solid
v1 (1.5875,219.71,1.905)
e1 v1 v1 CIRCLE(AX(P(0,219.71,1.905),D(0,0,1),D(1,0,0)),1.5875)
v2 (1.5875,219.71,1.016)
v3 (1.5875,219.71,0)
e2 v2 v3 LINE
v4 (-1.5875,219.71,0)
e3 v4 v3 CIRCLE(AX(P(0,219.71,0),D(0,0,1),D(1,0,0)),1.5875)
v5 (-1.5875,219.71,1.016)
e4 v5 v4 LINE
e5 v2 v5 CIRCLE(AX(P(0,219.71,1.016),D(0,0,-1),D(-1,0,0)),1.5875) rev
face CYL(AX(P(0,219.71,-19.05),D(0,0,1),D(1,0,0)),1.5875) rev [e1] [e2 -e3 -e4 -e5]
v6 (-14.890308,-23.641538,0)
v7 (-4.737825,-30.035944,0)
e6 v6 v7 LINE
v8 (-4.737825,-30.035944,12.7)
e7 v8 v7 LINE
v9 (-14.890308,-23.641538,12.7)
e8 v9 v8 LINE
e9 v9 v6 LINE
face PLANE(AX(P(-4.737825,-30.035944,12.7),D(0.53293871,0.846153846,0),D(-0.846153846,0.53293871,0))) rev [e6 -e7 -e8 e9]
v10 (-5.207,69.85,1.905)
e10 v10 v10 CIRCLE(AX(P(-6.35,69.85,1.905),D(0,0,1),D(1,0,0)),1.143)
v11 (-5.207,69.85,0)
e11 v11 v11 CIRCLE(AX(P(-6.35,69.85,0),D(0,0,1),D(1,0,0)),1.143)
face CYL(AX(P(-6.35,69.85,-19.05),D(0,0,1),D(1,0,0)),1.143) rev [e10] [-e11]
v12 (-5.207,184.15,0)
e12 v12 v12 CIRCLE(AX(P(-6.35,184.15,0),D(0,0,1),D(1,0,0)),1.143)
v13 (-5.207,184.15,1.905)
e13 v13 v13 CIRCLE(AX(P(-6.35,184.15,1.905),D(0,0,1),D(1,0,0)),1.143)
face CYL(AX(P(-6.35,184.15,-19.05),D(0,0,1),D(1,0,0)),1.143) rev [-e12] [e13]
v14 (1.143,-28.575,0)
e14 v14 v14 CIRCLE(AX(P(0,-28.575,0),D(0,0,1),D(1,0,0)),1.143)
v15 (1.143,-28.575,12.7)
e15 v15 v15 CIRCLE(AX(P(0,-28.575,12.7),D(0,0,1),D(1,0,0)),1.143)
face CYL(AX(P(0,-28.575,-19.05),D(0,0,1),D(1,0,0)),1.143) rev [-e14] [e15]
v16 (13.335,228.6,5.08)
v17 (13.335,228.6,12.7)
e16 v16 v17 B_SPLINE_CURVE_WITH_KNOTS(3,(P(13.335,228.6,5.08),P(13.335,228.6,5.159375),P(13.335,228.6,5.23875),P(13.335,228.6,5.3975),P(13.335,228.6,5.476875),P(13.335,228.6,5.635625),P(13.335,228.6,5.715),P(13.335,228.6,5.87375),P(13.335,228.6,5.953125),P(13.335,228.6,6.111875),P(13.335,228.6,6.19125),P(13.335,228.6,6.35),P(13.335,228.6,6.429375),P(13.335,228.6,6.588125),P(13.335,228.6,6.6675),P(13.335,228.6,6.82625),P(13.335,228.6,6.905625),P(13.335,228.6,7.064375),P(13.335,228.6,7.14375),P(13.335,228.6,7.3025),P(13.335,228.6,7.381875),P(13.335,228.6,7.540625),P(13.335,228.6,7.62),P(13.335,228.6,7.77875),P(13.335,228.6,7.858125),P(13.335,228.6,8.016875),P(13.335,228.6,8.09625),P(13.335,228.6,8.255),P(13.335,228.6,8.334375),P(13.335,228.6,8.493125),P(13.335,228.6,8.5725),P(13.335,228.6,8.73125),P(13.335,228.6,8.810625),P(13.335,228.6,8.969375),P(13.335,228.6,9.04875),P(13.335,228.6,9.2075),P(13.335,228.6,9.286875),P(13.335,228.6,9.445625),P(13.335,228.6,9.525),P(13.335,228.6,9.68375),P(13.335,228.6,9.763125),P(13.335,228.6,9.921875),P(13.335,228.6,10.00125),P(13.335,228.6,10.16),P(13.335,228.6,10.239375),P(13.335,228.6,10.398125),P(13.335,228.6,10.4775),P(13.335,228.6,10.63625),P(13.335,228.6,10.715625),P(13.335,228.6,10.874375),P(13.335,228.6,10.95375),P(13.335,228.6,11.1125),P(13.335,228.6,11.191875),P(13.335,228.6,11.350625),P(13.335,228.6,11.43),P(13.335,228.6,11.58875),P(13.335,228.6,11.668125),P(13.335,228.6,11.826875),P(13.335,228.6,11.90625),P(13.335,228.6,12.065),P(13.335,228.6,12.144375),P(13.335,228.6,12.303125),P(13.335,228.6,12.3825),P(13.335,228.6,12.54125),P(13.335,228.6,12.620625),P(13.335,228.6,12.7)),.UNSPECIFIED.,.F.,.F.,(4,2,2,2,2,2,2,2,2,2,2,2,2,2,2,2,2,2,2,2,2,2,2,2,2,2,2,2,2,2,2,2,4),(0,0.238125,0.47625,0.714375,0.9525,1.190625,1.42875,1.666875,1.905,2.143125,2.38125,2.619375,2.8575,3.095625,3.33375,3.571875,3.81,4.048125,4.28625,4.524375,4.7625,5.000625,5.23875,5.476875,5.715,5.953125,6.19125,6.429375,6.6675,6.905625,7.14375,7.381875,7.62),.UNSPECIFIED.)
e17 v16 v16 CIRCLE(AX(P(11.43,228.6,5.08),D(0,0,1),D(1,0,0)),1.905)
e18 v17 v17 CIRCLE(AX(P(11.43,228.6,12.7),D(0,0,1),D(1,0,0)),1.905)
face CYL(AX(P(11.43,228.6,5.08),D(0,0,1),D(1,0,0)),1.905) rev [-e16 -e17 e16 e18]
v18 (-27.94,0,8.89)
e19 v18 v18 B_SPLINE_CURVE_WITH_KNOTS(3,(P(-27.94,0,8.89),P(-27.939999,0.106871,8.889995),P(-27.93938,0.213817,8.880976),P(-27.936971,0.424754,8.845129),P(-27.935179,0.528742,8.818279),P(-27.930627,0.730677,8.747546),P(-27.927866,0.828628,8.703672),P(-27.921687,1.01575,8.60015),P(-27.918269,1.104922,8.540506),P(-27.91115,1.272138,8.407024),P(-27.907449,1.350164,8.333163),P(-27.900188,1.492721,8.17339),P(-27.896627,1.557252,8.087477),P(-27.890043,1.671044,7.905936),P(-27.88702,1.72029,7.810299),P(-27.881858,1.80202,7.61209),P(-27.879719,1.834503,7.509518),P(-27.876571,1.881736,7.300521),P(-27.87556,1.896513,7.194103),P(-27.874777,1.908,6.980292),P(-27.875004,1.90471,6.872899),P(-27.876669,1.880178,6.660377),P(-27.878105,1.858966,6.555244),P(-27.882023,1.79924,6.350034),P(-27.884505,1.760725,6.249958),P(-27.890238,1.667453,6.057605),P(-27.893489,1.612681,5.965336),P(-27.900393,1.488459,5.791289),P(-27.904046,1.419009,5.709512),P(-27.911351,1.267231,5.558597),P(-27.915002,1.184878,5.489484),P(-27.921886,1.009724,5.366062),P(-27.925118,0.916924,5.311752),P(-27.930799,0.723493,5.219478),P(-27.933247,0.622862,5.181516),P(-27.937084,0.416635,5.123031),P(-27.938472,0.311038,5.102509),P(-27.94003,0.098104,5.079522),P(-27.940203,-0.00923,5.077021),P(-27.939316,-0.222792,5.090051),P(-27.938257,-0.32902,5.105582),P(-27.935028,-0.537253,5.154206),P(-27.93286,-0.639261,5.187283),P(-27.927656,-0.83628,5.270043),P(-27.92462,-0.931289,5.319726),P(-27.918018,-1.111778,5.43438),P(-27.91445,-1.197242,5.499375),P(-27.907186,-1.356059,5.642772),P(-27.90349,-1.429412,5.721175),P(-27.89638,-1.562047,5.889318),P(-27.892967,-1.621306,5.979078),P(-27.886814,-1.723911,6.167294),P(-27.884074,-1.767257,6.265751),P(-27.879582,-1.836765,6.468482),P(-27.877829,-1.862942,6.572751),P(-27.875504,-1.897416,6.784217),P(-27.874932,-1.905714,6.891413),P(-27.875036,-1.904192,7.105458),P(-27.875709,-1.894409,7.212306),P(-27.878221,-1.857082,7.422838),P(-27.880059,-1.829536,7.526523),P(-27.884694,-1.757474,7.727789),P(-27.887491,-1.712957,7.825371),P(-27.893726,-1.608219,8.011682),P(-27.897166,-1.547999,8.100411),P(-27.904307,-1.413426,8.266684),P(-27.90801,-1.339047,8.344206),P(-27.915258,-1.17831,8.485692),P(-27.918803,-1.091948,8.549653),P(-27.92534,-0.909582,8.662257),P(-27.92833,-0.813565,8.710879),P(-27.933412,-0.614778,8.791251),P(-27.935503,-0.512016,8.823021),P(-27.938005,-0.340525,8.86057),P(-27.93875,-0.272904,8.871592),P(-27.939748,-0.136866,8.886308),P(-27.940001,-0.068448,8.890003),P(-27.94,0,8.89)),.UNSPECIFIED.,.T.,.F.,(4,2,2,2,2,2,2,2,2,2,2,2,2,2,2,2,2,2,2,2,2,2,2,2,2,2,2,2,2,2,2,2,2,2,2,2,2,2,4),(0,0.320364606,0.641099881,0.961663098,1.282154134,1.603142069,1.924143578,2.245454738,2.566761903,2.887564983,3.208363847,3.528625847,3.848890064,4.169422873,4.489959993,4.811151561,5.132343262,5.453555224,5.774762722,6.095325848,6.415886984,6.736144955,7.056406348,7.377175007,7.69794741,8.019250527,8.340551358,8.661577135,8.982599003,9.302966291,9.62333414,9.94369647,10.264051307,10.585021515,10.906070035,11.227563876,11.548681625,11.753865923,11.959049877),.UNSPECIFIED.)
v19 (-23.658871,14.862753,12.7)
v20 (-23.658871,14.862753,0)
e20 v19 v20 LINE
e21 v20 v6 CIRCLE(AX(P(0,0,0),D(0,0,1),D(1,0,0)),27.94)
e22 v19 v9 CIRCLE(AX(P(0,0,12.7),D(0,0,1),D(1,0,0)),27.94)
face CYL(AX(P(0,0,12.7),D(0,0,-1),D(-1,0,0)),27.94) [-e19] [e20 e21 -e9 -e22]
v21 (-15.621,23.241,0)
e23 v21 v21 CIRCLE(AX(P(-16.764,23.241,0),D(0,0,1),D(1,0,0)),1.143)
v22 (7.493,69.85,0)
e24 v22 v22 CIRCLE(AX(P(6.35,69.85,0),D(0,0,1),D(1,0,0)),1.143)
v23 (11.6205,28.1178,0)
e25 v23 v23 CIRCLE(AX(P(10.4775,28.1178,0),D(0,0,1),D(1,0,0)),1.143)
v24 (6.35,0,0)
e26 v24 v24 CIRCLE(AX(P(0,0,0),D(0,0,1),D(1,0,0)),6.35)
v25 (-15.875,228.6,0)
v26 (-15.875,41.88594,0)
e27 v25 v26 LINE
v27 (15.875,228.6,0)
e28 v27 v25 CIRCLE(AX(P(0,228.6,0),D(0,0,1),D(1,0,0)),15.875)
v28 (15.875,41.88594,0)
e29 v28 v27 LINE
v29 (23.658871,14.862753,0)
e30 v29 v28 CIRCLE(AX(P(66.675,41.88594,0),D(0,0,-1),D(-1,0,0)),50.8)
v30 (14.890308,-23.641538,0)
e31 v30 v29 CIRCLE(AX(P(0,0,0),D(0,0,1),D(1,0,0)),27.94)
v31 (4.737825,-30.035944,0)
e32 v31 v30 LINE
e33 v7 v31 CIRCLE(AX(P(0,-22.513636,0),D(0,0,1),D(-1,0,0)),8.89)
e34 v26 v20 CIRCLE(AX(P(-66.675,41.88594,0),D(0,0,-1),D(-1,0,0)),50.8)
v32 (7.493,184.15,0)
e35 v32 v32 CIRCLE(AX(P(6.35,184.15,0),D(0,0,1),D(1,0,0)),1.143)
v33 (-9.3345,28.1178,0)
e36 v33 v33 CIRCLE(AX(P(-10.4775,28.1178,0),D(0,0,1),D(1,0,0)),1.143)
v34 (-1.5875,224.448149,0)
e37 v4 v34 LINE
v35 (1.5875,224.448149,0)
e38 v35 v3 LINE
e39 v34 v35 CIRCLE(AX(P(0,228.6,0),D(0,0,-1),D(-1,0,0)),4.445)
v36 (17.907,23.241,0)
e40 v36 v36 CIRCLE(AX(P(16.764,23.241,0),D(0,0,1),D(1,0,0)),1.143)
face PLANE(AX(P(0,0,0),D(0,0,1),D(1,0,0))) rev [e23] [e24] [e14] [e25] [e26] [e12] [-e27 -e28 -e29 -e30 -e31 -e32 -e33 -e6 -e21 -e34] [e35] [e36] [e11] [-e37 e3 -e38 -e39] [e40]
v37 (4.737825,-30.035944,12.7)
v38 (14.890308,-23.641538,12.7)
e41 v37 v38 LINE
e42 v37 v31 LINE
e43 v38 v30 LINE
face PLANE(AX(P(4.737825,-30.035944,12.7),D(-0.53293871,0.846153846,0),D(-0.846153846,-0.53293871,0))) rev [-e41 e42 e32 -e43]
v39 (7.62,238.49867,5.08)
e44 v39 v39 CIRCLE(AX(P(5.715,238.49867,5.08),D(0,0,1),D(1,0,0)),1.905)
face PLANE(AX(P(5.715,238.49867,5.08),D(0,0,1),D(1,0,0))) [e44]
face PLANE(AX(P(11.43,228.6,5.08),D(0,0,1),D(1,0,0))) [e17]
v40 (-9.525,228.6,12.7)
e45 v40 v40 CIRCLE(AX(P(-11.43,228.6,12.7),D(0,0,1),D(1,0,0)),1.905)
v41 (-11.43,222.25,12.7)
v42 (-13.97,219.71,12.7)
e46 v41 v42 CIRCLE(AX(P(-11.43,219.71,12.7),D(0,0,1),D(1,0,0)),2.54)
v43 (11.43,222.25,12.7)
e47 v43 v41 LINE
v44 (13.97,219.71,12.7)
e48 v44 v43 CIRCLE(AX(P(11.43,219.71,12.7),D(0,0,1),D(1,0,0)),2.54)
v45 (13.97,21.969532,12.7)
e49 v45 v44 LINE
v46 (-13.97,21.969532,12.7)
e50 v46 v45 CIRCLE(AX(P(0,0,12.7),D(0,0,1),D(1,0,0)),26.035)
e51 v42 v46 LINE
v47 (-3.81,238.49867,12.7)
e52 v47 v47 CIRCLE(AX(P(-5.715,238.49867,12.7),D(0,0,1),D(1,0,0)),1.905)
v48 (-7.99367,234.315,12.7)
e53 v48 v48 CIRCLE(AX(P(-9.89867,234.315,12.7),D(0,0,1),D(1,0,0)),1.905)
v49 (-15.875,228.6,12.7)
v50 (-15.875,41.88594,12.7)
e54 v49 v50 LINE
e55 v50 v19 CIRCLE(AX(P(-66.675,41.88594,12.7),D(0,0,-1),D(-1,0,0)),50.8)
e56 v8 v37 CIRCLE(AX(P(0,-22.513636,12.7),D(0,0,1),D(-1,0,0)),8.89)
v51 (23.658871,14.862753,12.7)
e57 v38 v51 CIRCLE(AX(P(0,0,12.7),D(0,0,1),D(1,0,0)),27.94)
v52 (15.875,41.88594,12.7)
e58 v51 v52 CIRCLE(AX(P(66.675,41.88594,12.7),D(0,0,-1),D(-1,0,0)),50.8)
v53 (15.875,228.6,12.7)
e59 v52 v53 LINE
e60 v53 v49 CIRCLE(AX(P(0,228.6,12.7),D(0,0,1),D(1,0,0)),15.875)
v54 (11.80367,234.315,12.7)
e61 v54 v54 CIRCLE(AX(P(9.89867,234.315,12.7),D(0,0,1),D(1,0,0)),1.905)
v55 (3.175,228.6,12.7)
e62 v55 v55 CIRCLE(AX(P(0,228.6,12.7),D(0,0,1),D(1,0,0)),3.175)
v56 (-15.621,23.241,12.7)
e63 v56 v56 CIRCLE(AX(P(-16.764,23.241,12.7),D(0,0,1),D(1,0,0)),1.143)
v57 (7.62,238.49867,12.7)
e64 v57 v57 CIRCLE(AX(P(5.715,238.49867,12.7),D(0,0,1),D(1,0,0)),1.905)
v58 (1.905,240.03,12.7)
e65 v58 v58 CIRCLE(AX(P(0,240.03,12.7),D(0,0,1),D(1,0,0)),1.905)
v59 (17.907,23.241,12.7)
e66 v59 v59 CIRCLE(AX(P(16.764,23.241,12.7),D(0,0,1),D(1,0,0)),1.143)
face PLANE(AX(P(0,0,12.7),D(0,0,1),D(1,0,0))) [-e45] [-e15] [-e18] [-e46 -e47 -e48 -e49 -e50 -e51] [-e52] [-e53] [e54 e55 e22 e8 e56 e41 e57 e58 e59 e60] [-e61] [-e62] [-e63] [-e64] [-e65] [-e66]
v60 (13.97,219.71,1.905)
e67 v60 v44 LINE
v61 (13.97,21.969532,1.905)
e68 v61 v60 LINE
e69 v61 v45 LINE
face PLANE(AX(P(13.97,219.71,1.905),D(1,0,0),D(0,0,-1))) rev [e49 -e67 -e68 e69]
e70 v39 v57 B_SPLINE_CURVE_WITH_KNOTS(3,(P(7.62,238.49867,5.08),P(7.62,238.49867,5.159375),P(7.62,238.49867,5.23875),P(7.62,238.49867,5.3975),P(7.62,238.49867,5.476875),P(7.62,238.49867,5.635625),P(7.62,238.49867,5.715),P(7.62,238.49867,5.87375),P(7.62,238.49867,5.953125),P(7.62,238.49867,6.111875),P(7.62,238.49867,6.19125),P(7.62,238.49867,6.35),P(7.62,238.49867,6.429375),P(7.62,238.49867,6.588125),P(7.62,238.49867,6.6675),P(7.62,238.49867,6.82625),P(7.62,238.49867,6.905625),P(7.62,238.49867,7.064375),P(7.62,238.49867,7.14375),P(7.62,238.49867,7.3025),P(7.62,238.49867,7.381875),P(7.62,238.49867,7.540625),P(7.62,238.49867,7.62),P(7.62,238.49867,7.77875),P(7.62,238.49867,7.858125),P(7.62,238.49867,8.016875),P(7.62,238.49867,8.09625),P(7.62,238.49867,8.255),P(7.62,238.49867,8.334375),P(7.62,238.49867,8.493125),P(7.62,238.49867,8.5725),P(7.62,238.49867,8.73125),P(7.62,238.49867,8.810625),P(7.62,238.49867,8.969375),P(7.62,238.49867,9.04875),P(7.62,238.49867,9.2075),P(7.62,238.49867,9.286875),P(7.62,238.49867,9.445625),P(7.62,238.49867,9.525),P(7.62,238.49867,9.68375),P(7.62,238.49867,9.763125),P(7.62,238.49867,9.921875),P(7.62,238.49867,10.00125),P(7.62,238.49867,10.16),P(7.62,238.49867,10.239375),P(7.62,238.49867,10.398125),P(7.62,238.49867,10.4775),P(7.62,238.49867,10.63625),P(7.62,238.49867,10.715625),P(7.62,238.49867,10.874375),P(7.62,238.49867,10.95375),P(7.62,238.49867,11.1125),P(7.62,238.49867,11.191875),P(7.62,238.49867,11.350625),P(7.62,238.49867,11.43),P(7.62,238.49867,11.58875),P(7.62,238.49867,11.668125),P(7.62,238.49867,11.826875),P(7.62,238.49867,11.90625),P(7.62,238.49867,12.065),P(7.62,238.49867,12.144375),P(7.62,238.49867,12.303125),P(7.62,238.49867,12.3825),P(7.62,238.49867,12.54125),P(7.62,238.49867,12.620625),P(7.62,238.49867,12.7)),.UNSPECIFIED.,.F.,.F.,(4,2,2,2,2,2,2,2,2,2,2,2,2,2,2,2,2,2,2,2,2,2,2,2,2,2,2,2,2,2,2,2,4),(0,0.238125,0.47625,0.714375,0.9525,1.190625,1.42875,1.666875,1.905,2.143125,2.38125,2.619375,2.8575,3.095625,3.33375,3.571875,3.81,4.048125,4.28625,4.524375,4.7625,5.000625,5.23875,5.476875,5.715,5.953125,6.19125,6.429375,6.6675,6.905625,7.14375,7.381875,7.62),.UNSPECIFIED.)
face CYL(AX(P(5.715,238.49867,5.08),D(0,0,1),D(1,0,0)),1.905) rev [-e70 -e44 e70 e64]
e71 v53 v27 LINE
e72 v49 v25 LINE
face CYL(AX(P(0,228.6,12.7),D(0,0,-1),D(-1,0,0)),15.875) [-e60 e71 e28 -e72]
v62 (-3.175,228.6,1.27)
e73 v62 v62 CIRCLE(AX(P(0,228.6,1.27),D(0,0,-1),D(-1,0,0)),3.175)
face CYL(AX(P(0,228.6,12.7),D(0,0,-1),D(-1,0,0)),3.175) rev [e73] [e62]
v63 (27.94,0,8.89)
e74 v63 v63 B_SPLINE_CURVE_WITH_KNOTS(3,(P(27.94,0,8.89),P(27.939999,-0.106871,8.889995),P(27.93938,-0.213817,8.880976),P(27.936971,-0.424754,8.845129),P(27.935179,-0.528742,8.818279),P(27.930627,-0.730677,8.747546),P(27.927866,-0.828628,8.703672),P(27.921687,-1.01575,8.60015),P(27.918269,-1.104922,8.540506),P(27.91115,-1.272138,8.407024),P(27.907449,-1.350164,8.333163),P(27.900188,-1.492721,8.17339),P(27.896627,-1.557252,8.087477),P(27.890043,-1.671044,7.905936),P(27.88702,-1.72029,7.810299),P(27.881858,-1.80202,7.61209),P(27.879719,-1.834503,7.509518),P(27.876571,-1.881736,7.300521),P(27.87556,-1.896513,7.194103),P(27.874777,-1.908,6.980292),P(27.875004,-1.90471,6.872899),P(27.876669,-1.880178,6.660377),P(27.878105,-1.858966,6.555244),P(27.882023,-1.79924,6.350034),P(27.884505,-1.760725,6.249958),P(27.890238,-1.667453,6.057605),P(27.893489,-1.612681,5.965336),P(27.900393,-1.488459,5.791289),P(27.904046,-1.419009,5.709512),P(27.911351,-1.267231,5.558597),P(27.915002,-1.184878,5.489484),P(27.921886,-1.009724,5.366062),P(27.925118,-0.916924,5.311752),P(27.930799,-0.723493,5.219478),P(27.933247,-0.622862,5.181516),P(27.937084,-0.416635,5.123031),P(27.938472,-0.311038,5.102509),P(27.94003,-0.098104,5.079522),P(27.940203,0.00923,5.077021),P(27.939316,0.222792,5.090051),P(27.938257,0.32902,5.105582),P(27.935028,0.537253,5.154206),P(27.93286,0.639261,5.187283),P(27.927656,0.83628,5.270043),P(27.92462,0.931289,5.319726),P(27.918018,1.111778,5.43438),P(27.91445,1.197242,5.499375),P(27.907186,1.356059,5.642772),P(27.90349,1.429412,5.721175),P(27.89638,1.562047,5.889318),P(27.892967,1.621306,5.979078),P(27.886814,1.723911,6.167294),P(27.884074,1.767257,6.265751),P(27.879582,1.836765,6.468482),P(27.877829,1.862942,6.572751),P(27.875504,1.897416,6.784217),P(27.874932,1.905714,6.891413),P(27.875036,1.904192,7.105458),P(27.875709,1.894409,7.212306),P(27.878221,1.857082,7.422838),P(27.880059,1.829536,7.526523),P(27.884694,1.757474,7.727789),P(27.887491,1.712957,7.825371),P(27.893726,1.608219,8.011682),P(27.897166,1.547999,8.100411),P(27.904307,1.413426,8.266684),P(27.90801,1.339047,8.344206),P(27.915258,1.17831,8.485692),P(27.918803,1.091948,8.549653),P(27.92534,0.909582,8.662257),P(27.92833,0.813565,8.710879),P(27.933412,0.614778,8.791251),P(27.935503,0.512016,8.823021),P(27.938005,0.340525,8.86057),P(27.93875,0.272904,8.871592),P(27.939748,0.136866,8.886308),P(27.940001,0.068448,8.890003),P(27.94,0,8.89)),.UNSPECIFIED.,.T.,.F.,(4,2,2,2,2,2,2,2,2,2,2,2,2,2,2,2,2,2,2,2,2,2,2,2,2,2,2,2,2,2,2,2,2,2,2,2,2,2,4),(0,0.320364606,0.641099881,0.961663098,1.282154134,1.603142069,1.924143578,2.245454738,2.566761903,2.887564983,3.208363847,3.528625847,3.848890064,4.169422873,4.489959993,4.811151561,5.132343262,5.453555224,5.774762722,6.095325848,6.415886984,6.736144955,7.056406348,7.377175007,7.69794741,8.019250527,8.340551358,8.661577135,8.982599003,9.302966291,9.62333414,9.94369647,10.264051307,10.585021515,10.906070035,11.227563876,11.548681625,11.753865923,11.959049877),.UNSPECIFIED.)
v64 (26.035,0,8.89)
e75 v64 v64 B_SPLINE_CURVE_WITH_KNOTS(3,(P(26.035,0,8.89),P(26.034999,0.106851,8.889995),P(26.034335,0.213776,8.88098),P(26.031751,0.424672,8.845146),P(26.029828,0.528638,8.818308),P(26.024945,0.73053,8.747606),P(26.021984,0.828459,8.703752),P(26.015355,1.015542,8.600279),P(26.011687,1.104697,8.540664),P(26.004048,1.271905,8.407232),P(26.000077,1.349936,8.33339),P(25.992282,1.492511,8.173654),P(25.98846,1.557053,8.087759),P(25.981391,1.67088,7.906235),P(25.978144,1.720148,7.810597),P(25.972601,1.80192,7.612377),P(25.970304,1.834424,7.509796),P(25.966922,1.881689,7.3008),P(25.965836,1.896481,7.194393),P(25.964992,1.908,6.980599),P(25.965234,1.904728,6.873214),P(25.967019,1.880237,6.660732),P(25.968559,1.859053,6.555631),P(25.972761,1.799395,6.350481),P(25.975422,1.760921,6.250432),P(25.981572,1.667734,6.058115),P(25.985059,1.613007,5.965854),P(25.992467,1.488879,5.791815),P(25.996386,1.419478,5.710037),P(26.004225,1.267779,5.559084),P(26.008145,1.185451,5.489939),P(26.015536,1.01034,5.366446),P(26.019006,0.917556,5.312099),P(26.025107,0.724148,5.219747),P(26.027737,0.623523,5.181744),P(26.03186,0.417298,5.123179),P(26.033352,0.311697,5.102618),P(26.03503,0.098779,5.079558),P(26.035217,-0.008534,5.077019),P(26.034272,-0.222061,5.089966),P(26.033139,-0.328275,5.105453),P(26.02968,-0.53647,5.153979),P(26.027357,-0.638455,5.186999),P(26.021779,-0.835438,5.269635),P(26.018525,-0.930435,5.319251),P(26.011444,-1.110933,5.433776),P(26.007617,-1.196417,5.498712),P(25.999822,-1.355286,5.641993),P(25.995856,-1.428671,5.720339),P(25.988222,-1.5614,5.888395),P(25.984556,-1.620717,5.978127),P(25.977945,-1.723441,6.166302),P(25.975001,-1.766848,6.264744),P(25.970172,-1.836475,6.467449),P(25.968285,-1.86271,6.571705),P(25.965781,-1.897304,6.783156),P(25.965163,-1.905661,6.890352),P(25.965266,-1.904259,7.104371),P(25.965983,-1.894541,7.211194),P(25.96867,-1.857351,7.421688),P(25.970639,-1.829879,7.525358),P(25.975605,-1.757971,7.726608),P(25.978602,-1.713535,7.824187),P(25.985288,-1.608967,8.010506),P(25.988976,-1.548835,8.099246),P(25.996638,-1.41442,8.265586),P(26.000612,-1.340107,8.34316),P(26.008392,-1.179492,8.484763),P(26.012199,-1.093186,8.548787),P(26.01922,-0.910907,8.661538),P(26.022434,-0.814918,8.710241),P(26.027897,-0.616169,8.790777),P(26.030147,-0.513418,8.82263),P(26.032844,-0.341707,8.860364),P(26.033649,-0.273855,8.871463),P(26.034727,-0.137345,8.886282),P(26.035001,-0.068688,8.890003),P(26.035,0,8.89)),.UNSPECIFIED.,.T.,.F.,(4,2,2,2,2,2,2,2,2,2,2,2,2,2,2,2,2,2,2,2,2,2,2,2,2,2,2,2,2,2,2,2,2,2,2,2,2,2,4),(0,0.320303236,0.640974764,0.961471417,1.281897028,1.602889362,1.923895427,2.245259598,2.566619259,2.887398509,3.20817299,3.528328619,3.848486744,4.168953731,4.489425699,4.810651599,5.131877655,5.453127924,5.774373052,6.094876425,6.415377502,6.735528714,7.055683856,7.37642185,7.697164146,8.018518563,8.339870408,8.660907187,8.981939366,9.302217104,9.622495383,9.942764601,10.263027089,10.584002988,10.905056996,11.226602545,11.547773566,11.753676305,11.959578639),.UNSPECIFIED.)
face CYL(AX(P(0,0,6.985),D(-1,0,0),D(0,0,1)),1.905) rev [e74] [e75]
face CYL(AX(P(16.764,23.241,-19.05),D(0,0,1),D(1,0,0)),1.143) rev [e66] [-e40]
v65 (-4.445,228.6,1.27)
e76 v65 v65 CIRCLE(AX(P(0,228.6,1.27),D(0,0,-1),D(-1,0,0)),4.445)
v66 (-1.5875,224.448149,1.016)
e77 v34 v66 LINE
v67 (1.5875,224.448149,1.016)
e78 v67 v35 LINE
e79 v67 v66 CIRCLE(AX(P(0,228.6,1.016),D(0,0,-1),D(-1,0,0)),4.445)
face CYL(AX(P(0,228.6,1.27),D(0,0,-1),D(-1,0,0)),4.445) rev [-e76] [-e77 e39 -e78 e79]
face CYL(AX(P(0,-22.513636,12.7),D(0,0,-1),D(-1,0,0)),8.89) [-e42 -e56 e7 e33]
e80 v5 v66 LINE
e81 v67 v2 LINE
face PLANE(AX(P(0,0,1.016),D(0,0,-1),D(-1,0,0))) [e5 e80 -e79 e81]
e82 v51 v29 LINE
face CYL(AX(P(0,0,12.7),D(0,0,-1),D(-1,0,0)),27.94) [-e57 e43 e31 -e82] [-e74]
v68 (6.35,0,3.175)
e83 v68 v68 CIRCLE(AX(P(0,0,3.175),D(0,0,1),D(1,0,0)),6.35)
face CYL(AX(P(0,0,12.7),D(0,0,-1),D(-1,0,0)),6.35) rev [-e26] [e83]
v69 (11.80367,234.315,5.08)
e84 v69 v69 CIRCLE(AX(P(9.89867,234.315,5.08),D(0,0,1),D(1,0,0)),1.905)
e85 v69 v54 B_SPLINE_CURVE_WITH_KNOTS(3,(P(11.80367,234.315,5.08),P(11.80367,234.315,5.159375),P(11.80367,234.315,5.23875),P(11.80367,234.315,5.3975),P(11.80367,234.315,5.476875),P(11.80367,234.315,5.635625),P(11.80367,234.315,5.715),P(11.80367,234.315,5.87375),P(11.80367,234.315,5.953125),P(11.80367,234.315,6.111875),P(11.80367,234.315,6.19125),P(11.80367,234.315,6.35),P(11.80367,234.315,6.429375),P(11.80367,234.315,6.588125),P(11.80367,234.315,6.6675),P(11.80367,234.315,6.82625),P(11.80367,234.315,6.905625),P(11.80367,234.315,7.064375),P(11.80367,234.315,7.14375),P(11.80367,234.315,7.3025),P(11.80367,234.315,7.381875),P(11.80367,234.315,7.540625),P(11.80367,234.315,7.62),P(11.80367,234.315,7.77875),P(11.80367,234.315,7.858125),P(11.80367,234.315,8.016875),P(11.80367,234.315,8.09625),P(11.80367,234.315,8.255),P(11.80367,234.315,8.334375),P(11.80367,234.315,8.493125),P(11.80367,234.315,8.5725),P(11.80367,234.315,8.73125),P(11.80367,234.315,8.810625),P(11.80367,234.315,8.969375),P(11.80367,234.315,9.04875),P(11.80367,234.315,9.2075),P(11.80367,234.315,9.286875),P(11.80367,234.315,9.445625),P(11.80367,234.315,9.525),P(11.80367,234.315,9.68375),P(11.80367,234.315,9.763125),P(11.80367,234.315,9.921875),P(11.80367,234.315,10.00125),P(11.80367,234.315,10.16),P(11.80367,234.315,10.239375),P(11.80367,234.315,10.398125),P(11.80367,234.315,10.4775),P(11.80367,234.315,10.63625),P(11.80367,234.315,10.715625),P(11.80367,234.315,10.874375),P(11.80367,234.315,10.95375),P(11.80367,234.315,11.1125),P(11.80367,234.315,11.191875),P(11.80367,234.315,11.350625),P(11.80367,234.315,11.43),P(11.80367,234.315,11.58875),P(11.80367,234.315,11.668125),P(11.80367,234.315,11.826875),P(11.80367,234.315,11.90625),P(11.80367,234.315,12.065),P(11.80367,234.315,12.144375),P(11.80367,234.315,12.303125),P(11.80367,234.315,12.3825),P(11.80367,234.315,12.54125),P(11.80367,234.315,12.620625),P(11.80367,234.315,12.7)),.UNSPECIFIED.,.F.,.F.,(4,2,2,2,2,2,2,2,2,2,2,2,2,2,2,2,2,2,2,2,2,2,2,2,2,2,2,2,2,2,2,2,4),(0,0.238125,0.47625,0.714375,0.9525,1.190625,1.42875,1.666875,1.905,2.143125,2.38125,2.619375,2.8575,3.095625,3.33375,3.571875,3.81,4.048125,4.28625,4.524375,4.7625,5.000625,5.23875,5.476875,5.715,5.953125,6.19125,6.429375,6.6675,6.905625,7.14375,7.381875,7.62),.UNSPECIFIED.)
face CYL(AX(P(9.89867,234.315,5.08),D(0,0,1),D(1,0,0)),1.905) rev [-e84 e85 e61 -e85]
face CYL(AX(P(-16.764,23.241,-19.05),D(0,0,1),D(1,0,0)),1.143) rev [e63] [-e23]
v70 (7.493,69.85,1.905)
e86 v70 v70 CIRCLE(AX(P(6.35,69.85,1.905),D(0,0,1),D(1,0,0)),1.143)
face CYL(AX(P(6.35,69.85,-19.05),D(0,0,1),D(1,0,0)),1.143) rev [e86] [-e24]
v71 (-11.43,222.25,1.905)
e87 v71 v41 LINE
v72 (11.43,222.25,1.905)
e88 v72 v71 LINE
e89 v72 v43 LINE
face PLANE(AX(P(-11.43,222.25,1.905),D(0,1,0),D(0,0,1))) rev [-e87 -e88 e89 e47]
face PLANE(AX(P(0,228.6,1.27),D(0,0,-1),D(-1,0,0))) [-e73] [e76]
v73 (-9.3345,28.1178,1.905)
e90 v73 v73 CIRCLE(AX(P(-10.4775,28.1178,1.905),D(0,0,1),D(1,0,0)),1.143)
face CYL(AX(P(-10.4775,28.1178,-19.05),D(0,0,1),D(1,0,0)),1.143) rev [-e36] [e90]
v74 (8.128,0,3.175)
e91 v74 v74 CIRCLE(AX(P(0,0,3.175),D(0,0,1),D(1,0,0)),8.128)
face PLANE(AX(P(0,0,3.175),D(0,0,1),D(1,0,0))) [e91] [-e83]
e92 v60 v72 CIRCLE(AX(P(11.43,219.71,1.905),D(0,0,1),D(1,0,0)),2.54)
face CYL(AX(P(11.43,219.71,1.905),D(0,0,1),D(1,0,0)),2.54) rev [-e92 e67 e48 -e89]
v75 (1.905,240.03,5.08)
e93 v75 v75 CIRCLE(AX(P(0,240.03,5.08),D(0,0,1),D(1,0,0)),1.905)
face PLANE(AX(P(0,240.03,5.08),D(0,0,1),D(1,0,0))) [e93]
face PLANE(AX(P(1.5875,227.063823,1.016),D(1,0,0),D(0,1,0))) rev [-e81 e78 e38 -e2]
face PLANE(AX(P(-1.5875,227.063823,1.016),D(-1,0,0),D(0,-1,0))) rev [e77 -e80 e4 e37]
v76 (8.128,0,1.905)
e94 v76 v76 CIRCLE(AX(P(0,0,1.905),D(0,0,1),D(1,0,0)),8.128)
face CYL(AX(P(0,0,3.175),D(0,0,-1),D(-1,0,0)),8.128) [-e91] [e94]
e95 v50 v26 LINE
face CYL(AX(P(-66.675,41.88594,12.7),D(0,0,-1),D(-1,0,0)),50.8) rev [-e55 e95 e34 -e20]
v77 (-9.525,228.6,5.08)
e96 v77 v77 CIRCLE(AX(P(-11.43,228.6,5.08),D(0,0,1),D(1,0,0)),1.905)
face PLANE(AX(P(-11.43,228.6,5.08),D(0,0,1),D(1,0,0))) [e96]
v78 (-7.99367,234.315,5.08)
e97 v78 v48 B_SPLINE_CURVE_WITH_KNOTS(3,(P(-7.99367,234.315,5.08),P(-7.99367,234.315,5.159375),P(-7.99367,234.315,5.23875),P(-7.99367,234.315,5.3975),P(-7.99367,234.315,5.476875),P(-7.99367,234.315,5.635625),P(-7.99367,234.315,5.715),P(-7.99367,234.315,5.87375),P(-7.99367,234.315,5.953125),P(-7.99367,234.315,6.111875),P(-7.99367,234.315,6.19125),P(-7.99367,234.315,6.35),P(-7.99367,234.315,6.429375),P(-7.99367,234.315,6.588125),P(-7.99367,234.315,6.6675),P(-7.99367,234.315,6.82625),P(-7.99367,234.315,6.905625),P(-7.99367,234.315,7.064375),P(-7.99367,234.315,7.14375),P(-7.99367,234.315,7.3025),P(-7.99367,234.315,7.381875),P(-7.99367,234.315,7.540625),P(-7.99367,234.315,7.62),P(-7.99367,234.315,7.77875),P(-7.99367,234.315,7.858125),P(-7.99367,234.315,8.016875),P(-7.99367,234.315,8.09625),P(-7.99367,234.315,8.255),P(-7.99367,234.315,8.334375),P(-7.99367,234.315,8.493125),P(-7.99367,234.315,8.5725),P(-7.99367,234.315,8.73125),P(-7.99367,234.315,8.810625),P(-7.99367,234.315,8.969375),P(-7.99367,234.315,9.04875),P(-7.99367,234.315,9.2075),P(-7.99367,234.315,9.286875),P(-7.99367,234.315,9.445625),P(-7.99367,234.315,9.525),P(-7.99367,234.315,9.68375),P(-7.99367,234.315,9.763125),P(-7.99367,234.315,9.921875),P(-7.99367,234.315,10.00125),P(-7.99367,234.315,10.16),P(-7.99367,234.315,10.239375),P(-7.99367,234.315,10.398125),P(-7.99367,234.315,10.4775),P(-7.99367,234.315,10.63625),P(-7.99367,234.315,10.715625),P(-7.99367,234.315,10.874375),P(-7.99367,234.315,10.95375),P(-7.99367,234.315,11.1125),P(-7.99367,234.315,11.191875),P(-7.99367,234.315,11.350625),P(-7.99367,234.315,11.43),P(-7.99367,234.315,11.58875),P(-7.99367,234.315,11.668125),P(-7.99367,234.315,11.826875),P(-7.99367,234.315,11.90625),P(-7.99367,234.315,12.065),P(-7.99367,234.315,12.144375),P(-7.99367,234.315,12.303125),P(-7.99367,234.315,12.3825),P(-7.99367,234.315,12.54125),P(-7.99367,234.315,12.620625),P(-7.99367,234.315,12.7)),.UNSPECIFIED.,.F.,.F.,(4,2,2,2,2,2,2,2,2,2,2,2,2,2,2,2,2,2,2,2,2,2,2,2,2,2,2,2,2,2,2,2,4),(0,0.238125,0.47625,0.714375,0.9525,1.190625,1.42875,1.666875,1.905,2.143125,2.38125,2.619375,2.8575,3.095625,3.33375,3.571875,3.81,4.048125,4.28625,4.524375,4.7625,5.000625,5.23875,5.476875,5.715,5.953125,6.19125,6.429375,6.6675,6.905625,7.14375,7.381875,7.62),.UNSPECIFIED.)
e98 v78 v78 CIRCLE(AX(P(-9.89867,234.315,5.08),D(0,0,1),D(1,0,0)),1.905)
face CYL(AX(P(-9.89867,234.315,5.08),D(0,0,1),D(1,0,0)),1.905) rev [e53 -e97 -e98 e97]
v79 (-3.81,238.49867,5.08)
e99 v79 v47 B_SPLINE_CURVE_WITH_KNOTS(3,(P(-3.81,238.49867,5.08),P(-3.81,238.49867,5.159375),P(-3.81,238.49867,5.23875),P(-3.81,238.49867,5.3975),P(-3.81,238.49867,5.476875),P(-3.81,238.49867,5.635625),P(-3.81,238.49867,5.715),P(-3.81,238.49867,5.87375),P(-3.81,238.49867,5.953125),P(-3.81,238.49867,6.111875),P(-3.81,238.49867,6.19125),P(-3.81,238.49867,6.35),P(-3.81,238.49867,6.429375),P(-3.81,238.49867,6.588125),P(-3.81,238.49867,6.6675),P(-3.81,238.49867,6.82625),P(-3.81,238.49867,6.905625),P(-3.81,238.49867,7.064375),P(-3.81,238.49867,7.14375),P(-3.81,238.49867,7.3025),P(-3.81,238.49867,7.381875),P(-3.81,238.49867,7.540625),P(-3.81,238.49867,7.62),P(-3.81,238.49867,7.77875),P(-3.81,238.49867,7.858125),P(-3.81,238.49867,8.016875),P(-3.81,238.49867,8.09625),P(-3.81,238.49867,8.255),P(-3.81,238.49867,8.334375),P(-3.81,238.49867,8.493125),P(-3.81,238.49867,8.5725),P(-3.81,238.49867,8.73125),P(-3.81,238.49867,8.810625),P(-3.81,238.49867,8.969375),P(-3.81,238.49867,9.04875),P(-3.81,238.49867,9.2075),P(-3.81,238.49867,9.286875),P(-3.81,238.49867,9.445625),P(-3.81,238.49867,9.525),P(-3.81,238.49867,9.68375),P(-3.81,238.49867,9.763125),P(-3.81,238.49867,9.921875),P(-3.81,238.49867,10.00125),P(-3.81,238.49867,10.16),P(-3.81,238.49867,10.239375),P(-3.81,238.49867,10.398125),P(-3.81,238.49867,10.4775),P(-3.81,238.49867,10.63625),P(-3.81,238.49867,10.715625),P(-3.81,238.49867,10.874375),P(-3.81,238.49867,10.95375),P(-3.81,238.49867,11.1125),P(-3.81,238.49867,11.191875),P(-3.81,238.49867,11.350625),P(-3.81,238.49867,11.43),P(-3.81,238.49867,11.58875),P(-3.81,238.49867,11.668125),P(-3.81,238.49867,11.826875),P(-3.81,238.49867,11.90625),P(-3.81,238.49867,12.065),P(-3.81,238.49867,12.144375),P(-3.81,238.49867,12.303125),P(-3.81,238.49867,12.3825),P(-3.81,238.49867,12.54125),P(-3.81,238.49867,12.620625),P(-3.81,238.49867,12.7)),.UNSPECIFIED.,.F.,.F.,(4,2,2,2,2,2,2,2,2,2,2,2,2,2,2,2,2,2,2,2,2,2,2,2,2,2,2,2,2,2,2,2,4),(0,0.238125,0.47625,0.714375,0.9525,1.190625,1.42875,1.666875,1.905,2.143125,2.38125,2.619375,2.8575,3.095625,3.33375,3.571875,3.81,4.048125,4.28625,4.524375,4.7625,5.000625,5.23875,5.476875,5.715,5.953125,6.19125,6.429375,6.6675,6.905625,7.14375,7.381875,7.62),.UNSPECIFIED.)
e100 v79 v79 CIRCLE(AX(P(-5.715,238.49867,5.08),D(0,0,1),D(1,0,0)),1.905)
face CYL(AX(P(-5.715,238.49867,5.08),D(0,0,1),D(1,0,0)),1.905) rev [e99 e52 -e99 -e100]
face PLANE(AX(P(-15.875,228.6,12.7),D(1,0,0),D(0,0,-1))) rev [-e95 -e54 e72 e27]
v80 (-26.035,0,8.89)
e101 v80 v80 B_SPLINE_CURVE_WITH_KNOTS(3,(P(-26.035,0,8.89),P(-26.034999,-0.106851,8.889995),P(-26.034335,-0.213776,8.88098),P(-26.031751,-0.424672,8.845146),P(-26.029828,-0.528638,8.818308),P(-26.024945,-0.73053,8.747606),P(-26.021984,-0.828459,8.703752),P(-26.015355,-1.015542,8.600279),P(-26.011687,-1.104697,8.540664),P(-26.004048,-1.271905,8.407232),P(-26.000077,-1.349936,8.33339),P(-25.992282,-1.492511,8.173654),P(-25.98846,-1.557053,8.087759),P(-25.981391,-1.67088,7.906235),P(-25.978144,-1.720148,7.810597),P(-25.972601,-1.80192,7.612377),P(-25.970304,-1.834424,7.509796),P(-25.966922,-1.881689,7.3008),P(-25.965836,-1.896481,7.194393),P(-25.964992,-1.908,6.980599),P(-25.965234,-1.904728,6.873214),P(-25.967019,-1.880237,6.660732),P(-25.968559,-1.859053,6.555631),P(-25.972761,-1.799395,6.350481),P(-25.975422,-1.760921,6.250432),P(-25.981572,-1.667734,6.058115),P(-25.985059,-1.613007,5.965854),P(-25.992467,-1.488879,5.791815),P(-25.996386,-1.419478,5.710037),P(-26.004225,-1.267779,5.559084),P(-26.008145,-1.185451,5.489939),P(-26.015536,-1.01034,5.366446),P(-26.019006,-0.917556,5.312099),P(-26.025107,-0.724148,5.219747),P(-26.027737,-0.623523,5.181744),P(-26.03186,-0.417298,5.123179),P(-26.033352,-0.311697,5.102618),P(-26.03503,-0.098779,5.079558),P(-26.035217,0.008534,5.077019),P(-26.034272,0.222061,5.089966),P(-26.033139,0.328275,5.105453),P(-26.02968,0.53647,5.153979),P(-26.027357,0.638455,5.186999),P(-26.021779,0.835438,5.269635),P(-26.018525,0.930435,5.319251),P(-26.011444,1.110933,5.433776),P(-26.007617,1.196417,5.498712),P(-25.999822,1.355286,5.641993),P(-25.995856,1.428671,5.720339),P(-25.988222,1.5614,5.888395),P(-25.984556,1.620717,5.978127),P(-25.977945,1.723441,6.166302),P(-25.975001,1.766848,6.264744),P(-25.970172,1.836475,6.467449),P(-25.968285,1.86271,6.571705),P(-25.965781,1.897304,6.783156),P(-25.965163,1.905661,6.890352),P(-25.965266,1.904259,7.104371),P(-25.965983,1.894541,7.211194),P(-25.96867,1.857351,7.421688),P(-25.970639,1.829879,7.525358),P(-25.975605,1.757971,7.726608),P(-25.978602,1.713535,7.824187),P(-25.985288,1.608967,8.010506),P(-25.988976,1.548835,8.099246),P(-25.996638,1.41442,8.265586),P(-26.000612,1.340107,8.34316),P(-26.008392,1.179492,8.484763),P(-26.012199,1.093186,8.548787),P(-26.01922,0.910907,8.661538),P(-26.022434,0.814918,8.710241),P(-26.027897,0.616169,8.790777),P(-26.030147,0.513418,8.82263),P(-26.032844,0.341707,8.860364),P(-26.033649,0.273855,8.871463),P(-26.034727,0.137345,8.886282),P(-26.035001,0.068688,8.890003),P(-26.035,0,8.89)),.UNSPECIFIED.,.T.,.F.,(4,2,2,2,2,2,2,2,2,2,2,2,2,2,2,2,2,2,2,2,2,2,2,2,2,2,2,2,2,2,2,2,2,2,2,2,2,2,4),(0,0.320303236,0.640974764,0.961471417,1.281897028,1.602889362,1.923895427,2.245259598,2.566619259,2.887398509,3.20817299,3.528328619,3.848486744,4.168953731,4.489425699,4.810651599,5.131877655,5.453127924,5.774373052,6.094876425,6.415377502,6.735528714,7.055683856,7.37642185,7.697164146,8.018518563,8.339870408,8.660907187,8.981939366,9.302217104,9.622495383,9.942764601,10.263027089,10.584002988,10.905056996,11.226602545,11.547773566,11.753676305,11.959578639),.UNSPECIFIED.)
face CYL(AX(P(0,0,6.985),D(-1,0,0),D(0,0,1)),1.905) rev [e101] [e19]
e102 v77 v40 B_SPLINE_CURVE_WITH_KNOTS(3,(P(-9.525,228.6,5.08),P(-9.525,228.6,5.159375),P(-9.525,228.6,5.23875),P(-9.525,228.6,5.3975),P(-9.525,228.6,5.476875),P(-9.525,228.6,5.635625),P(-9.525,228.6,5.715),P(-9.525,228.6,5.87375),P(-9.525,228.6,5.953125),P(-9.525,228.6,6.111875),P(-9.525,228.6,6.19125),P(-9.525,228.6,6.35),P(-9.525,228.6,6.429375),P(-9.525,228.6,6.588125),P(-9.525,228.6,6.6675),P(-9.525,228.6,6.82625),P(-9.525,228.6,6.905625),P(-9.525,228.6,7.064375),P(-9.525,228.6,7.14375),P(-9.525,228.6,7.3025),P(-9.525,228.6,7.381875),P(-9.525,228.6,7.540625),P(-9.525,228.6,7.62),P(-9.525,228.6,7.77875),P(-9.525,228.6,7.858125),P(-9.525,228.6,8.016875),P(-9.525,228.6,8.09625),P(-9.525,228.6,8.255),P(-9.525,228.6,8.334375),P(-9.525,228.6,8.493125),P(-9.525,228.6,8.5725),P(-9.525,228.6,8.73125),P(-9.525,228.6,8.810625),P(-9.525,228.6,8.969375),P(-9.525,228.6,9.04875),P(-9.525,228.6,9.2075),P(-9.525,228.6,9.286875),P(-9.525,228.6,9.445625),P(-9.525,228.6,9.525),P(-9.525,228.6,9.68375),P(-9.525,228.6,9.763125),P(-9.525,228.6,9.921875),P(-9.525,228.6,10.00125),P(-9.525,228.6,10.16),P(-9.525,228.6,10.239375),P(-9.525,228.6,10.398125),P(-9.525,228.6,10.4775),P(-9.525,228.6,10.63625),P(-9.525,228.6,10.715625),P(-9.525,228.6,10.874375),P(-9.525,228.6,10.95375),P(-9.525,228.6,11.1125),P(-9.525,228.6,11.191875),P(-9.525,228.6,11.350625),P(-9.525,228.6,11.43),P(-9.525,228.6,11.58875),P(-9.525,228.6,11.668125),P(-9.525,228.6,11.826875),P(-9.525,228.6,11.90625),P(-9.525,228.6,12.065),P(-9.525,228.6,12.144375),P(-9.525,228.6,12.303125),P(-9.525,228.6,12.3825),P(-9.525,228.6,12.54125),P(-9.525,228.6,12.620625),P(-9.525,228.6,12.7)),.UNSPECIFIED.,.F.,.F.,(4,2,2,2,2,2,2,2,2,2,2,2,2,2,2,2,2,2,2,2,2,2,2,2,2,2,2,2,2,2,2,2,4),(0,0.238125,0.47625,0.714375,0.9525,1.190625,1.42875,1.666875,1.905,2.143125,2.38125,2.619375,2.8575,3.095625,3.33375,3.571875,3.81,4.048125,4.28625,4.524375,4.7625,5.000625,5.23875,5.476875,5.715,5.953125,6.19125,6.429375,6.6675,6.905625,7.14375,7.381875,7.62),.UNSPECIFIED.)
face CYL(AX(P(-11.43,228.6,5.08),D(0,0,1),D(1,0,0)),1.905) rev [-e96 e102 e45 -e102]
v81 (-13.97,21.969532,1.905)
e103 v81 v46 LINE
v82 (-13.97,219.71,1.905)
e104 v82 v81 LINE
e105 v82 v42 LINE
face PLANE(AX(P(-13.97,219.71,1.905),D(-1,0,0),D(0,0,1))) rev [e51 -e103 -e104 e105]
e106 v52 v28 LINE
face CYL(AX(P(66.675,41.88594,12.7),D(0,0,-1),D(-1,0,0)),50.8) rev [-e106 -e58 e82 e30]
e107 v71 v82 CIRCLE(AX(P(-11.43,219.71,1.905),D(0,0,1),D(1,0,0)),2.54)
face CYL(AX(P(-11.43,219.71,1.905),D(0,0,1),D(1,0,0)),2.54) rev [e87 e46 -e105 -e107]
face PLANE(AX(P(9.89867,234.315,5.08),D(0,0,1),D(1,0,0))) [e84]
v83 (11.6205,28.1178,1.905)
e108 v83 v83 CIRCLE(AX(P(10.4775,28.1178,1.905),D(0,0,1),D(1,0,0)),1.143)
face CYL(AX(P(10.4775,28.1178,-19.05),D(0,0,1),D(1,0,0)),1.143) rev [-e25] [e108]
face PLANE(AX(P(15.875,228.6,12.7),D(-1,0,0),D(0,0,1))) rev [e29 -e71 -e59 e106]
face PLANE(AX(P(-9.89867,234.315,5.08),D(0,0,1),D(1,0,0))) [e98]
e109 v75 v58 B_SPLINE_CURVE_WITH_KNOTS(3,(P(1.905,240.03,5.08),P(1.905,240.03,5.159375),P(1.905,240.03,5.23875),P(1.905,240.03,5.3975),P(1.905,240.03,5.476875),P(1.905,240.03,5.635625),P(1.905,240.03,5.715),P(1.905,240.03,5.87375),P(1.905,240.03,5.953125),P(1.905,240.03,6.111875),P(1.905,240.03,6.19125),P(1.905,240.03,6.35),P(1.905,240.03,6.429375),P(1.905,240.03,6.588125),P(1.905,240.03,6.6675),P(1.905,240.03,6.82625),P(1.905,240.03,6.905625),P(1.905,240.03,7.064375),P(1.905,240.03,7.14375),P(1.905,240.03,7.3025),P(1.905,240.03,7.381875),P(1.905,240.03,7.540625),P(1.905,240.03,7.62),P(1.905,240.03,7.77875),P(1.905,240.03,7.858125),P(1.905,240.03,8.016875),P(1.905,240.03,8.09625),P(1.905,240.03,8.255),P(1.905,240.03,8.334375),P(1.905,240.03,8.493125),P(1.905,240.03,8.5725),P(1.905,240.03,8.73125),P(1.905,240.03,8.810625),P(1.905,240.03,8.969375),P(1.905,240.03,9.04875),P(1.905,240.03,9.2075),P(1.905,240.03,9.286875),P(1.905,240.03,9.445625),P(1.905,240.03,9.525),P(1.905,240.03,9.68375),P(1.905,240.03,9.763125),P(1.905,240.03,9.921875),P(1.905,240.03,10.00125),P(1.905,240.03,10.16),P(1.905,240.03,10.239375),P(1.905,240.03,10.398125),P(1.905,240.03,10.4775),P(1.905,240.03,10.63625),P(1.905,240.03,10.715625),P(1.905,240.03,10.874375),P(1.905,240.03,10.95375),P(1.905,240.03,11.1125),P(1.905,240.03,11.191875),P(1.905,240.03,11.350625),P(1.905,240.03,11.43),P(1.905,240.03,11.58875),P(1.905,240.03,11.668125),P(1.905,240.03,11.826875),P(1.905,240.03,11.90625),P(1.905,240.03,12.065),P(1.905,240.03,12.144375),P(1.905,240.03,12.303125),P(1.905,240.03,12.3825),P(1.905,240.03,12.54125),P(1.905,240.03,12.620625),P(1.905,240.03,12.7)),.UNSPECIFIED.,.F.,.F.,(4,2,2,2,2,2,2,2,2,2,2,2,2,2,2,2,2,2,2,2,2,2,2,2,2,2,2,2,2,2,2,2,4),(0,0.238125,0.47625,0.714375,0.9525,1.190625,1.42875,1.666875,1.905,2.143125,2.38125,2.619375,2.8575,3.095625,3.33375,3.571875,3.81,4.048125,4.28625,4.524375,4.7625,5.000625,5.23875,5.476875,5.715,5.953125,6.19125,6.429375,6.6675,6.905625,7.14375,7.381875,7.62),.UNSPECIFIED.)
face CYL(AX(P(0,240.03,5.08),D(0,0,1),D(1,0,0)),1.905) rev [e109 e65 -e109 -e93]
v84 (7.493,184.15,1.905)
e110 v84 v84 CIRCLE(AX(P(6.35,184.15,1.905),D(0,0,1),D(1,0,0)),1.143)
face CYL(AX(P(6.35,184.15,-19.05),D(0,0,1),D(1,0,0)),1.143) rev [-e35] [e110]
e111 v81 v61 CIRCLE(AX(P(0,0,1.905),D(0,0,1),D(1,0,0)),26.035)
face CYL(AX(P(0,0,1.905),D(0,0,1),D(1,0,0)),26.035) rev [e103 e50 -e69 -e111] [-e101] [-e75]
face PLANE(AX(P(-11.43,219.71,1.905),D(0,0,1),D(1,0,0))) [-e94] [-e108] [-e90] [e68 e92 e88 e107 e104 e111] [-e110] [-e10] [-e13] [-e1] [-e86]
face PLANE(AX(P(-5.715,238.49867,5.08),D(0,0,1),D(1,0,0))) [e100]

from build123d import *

# Parameters (mm, degrees)
SKETCH1_R              = 6.35
SKETCH1_R_2            = 3.175
BOSS_EXTRUDE1_DEPTH    = 12.7
CUT_EXTRUDE1_DEPTH     = 10.795
CUT_EXTRUDE2_START     = -29
CUT_EXTRUDE2_OUTLINE_R = 1.905
CUT_EXTRUDE2_DEPTH     = 58
SKETCH3_R              = 8.128
SKETCH3_R_2            = 6.35
BOSS_EXTRUDE2_DEPTH    = 1.27
SKETCH4_R              = 1.5875
SKETCH4_R_2            = 1.143
CUT_EXTRUDE3_DEPTH     = 31.75
SKETCH5_R              = 1.905
CUT_EXTRUDE4_DEPTH     = 7.62
SKETCH6_W              = 3.175
SKETCH6_H              = 7.353822806
CUT_EXTRUDE5_DEPTH     = 1.016
SKETCH7_R              = 4.445
CUT_EXTRUDE6_DEPTH     = 1.27


with BuildPart() as part:
    # Sketch1 → Boss-Extrude1 (new body)
    with BuildSketch(Plane.XY):
        with BuildLine():
            Line((-15.875, 228.6), (-15.875, 41.885940063))
            ThreePointArc((-15.875, 41.885940063), (-17.859739298, 27.82498979), (-23.658870968, 14.862752926))
            ThreePointArc((-23.658870968, 14.862752926), (-27.242520167, -6.203925768), (-14.890307558, -23.641538462))
            Line((-14.890307558, -23.641538462), (-4.737825132, -30.035944056))
            ThreePointArc((-4.737825132, -30.035944056), (0, -31.403636364), (4.737825132, -30.035944056))
            Line((4.737825132, -30.035944056), (14.890307558, -23.641538462))
            ThreePointArc((14.890307558, -23.641538462), (27.242520167, -6.203925768), (23.658870968, 14.862752926))
            ThreePointArc((23.658870968, 14.862752926), (17.859739298, 27.82498979), (15.875, 41.885940063))
            Line((15.875, 41.885940063), (15.875, 228.6))
            ThreePointArc((15.875, 228.6), (0, 244.475), (-15.875, 228.6))
        make_face()
        Circle(SKETCH1_R, mode=Mode.SUBTRACT)
        with Locations((0, 228.6)):
            Circle(SKETCH1_R_2, mode=Mode.SUBTRACT)
    extrude(amount=BOSS_EXTRUDE1_DEPTH)

    # Sketch2 → Cut-Extrude1 (cut)
    with BuildSketch(Plane.XY.offset(12.7)):
        with BuildLine():
            Line((-11.43, 222.25), (11.43, 222.25))
            ThreePointArc((11.43, 222.25), (13.226051224, 221.506051224), (13.97, 219.71))
            Line((13.97, 219.71), (13.97, 21.969531743))
            ThreePointArc((13.97, 21.969531743), (0, -26.035), (-13.97, 21.969531743))
            Line((-13.97, 21.969531743), (-13.97, 219.71))
            ThreePointArc((-13.97, 219.71), (-13.226051224, 221.506051224), (-11.43, 222.25))
        make_face()
    extrude(amount=-CUT_EXTRUDE1_DEPTH, mode=Mode.SUBTRACT)

    # Cut-Extrude2: read off the stored shape, not the designer's step
    # Cut-Extrude2 outline → Cut-Extrude2 (cut)
    with BuildSketch(Plane.YZ.offset(CUT_EXTRUDE2_START)):
        with Locations((0, 6.985)):
            Circle(CUT_EXTRUDE2_OUTLINE_R)
    extrude(amount=CUT_EXTRUDE2_DEPTH, mode=Mode.SUBTRACT)

    # Sketch3 → Boss-Extrude2 (add)
    with BuildSketch(Plane.XY.offset(1.905)):
        Circle(SKETCH3_R)
        Circle(SKETCH3_R_2, mode=Mode.SUBTRACT)
    extrude(amount=BOSS_EXTRUDE2_DEPTH)

    # Sketch4 → Cut-Extrude3 (cut)
    with BuildSketch(Plane.XY.offset(12.7)):
        with Locations((0, 219.71)):
            Circle(SKETCH4_R)
        with Locations((-6.35, 184.15)):
            Circle(SKETCH4_R_2)
        with Locations((6.35, 184.15)):
            Circle(SKETCH4_R_2)
        with Locations((-6.35, 69.85)):
            Circle(SKETCH4_R_2)
        with Locations((6.35, 69.85)):
            Circle(SKETCH4_R_2)
        with Locations((-16.764, 23.241)):
            Circle(SKETCH4_R_2)
        with Locations((16.764, 23.241)):
            Circle(SKETCH4_R_2)
        with Locations((0, -28.575)):
            Circle(SKETCH4_R_2)
        with Locations((-10.4775, 28.1178)):
            Circle(SKETCH4_R_2)
        with Locations((10.4775, 28.1178)):
            Circle(SKETCH4_R_2)
    extrude(amount=-CUT_EXTRUDE3_DEPTH, mode=Mode.SUBTRACT)

    # Sketch5 → Cut-Extrude4 (cut)
    with BuildSketch(Plane.XY.offset(12.7)):
        with Locations((-11.43, 228.6)):
            Circle(SKETCH5_R)
        with Locations((-9.898670365, 234.315)):
            Circle(SKETCH5_R)
        with Locations((-5.715, 238.498670365)):
            Circle(SKETCH5_R)
        with Locations((0, 240.03)):
            Circle(SKETCH5_R)
        with Locations((5.715, 238.498670365)):
            Circle(SKETCH5_R)
        with Locations((9.898670365, 234.315)):
            Circle(SKETCH5_R)
        with Locations((11.43, 228.6)):
            Circle(SKETCH5_R)
    extrude(amount=-CUT_EXTRUDE4_DEPTH, mode=Mode.SUBTRACT)

    # Sketch6 → Cut-Extrude5 (cut)
    with BuildSketch(Plane(origin=(0, 0, 0), x_dir=(-1, 0, 0), z_dir=(0, 0, -1))):
        with Locations((0, 223.386911403)):
            Rectangle(SKETCH6_W, SKETCH6_H)
    extrude(amount=-CUT_EXTRUDE5_DEPTH, mode=Mode.SUBTRACT)

    # Sketch7 → Cut-Extrude6 (cut)
    with BuildSketch(Plane(origin=(0, 0, 0), x_dir=(-1, 0, 0), z_dir=(0, 0, -1))):
        with Locations((0, 228.6)):
            Circle(SKETCH7_R)
    extrude(amount=-CUT_EXTRUDE6_DEPTH, mode=Mode.SUBTRACT)


solid = part.part
